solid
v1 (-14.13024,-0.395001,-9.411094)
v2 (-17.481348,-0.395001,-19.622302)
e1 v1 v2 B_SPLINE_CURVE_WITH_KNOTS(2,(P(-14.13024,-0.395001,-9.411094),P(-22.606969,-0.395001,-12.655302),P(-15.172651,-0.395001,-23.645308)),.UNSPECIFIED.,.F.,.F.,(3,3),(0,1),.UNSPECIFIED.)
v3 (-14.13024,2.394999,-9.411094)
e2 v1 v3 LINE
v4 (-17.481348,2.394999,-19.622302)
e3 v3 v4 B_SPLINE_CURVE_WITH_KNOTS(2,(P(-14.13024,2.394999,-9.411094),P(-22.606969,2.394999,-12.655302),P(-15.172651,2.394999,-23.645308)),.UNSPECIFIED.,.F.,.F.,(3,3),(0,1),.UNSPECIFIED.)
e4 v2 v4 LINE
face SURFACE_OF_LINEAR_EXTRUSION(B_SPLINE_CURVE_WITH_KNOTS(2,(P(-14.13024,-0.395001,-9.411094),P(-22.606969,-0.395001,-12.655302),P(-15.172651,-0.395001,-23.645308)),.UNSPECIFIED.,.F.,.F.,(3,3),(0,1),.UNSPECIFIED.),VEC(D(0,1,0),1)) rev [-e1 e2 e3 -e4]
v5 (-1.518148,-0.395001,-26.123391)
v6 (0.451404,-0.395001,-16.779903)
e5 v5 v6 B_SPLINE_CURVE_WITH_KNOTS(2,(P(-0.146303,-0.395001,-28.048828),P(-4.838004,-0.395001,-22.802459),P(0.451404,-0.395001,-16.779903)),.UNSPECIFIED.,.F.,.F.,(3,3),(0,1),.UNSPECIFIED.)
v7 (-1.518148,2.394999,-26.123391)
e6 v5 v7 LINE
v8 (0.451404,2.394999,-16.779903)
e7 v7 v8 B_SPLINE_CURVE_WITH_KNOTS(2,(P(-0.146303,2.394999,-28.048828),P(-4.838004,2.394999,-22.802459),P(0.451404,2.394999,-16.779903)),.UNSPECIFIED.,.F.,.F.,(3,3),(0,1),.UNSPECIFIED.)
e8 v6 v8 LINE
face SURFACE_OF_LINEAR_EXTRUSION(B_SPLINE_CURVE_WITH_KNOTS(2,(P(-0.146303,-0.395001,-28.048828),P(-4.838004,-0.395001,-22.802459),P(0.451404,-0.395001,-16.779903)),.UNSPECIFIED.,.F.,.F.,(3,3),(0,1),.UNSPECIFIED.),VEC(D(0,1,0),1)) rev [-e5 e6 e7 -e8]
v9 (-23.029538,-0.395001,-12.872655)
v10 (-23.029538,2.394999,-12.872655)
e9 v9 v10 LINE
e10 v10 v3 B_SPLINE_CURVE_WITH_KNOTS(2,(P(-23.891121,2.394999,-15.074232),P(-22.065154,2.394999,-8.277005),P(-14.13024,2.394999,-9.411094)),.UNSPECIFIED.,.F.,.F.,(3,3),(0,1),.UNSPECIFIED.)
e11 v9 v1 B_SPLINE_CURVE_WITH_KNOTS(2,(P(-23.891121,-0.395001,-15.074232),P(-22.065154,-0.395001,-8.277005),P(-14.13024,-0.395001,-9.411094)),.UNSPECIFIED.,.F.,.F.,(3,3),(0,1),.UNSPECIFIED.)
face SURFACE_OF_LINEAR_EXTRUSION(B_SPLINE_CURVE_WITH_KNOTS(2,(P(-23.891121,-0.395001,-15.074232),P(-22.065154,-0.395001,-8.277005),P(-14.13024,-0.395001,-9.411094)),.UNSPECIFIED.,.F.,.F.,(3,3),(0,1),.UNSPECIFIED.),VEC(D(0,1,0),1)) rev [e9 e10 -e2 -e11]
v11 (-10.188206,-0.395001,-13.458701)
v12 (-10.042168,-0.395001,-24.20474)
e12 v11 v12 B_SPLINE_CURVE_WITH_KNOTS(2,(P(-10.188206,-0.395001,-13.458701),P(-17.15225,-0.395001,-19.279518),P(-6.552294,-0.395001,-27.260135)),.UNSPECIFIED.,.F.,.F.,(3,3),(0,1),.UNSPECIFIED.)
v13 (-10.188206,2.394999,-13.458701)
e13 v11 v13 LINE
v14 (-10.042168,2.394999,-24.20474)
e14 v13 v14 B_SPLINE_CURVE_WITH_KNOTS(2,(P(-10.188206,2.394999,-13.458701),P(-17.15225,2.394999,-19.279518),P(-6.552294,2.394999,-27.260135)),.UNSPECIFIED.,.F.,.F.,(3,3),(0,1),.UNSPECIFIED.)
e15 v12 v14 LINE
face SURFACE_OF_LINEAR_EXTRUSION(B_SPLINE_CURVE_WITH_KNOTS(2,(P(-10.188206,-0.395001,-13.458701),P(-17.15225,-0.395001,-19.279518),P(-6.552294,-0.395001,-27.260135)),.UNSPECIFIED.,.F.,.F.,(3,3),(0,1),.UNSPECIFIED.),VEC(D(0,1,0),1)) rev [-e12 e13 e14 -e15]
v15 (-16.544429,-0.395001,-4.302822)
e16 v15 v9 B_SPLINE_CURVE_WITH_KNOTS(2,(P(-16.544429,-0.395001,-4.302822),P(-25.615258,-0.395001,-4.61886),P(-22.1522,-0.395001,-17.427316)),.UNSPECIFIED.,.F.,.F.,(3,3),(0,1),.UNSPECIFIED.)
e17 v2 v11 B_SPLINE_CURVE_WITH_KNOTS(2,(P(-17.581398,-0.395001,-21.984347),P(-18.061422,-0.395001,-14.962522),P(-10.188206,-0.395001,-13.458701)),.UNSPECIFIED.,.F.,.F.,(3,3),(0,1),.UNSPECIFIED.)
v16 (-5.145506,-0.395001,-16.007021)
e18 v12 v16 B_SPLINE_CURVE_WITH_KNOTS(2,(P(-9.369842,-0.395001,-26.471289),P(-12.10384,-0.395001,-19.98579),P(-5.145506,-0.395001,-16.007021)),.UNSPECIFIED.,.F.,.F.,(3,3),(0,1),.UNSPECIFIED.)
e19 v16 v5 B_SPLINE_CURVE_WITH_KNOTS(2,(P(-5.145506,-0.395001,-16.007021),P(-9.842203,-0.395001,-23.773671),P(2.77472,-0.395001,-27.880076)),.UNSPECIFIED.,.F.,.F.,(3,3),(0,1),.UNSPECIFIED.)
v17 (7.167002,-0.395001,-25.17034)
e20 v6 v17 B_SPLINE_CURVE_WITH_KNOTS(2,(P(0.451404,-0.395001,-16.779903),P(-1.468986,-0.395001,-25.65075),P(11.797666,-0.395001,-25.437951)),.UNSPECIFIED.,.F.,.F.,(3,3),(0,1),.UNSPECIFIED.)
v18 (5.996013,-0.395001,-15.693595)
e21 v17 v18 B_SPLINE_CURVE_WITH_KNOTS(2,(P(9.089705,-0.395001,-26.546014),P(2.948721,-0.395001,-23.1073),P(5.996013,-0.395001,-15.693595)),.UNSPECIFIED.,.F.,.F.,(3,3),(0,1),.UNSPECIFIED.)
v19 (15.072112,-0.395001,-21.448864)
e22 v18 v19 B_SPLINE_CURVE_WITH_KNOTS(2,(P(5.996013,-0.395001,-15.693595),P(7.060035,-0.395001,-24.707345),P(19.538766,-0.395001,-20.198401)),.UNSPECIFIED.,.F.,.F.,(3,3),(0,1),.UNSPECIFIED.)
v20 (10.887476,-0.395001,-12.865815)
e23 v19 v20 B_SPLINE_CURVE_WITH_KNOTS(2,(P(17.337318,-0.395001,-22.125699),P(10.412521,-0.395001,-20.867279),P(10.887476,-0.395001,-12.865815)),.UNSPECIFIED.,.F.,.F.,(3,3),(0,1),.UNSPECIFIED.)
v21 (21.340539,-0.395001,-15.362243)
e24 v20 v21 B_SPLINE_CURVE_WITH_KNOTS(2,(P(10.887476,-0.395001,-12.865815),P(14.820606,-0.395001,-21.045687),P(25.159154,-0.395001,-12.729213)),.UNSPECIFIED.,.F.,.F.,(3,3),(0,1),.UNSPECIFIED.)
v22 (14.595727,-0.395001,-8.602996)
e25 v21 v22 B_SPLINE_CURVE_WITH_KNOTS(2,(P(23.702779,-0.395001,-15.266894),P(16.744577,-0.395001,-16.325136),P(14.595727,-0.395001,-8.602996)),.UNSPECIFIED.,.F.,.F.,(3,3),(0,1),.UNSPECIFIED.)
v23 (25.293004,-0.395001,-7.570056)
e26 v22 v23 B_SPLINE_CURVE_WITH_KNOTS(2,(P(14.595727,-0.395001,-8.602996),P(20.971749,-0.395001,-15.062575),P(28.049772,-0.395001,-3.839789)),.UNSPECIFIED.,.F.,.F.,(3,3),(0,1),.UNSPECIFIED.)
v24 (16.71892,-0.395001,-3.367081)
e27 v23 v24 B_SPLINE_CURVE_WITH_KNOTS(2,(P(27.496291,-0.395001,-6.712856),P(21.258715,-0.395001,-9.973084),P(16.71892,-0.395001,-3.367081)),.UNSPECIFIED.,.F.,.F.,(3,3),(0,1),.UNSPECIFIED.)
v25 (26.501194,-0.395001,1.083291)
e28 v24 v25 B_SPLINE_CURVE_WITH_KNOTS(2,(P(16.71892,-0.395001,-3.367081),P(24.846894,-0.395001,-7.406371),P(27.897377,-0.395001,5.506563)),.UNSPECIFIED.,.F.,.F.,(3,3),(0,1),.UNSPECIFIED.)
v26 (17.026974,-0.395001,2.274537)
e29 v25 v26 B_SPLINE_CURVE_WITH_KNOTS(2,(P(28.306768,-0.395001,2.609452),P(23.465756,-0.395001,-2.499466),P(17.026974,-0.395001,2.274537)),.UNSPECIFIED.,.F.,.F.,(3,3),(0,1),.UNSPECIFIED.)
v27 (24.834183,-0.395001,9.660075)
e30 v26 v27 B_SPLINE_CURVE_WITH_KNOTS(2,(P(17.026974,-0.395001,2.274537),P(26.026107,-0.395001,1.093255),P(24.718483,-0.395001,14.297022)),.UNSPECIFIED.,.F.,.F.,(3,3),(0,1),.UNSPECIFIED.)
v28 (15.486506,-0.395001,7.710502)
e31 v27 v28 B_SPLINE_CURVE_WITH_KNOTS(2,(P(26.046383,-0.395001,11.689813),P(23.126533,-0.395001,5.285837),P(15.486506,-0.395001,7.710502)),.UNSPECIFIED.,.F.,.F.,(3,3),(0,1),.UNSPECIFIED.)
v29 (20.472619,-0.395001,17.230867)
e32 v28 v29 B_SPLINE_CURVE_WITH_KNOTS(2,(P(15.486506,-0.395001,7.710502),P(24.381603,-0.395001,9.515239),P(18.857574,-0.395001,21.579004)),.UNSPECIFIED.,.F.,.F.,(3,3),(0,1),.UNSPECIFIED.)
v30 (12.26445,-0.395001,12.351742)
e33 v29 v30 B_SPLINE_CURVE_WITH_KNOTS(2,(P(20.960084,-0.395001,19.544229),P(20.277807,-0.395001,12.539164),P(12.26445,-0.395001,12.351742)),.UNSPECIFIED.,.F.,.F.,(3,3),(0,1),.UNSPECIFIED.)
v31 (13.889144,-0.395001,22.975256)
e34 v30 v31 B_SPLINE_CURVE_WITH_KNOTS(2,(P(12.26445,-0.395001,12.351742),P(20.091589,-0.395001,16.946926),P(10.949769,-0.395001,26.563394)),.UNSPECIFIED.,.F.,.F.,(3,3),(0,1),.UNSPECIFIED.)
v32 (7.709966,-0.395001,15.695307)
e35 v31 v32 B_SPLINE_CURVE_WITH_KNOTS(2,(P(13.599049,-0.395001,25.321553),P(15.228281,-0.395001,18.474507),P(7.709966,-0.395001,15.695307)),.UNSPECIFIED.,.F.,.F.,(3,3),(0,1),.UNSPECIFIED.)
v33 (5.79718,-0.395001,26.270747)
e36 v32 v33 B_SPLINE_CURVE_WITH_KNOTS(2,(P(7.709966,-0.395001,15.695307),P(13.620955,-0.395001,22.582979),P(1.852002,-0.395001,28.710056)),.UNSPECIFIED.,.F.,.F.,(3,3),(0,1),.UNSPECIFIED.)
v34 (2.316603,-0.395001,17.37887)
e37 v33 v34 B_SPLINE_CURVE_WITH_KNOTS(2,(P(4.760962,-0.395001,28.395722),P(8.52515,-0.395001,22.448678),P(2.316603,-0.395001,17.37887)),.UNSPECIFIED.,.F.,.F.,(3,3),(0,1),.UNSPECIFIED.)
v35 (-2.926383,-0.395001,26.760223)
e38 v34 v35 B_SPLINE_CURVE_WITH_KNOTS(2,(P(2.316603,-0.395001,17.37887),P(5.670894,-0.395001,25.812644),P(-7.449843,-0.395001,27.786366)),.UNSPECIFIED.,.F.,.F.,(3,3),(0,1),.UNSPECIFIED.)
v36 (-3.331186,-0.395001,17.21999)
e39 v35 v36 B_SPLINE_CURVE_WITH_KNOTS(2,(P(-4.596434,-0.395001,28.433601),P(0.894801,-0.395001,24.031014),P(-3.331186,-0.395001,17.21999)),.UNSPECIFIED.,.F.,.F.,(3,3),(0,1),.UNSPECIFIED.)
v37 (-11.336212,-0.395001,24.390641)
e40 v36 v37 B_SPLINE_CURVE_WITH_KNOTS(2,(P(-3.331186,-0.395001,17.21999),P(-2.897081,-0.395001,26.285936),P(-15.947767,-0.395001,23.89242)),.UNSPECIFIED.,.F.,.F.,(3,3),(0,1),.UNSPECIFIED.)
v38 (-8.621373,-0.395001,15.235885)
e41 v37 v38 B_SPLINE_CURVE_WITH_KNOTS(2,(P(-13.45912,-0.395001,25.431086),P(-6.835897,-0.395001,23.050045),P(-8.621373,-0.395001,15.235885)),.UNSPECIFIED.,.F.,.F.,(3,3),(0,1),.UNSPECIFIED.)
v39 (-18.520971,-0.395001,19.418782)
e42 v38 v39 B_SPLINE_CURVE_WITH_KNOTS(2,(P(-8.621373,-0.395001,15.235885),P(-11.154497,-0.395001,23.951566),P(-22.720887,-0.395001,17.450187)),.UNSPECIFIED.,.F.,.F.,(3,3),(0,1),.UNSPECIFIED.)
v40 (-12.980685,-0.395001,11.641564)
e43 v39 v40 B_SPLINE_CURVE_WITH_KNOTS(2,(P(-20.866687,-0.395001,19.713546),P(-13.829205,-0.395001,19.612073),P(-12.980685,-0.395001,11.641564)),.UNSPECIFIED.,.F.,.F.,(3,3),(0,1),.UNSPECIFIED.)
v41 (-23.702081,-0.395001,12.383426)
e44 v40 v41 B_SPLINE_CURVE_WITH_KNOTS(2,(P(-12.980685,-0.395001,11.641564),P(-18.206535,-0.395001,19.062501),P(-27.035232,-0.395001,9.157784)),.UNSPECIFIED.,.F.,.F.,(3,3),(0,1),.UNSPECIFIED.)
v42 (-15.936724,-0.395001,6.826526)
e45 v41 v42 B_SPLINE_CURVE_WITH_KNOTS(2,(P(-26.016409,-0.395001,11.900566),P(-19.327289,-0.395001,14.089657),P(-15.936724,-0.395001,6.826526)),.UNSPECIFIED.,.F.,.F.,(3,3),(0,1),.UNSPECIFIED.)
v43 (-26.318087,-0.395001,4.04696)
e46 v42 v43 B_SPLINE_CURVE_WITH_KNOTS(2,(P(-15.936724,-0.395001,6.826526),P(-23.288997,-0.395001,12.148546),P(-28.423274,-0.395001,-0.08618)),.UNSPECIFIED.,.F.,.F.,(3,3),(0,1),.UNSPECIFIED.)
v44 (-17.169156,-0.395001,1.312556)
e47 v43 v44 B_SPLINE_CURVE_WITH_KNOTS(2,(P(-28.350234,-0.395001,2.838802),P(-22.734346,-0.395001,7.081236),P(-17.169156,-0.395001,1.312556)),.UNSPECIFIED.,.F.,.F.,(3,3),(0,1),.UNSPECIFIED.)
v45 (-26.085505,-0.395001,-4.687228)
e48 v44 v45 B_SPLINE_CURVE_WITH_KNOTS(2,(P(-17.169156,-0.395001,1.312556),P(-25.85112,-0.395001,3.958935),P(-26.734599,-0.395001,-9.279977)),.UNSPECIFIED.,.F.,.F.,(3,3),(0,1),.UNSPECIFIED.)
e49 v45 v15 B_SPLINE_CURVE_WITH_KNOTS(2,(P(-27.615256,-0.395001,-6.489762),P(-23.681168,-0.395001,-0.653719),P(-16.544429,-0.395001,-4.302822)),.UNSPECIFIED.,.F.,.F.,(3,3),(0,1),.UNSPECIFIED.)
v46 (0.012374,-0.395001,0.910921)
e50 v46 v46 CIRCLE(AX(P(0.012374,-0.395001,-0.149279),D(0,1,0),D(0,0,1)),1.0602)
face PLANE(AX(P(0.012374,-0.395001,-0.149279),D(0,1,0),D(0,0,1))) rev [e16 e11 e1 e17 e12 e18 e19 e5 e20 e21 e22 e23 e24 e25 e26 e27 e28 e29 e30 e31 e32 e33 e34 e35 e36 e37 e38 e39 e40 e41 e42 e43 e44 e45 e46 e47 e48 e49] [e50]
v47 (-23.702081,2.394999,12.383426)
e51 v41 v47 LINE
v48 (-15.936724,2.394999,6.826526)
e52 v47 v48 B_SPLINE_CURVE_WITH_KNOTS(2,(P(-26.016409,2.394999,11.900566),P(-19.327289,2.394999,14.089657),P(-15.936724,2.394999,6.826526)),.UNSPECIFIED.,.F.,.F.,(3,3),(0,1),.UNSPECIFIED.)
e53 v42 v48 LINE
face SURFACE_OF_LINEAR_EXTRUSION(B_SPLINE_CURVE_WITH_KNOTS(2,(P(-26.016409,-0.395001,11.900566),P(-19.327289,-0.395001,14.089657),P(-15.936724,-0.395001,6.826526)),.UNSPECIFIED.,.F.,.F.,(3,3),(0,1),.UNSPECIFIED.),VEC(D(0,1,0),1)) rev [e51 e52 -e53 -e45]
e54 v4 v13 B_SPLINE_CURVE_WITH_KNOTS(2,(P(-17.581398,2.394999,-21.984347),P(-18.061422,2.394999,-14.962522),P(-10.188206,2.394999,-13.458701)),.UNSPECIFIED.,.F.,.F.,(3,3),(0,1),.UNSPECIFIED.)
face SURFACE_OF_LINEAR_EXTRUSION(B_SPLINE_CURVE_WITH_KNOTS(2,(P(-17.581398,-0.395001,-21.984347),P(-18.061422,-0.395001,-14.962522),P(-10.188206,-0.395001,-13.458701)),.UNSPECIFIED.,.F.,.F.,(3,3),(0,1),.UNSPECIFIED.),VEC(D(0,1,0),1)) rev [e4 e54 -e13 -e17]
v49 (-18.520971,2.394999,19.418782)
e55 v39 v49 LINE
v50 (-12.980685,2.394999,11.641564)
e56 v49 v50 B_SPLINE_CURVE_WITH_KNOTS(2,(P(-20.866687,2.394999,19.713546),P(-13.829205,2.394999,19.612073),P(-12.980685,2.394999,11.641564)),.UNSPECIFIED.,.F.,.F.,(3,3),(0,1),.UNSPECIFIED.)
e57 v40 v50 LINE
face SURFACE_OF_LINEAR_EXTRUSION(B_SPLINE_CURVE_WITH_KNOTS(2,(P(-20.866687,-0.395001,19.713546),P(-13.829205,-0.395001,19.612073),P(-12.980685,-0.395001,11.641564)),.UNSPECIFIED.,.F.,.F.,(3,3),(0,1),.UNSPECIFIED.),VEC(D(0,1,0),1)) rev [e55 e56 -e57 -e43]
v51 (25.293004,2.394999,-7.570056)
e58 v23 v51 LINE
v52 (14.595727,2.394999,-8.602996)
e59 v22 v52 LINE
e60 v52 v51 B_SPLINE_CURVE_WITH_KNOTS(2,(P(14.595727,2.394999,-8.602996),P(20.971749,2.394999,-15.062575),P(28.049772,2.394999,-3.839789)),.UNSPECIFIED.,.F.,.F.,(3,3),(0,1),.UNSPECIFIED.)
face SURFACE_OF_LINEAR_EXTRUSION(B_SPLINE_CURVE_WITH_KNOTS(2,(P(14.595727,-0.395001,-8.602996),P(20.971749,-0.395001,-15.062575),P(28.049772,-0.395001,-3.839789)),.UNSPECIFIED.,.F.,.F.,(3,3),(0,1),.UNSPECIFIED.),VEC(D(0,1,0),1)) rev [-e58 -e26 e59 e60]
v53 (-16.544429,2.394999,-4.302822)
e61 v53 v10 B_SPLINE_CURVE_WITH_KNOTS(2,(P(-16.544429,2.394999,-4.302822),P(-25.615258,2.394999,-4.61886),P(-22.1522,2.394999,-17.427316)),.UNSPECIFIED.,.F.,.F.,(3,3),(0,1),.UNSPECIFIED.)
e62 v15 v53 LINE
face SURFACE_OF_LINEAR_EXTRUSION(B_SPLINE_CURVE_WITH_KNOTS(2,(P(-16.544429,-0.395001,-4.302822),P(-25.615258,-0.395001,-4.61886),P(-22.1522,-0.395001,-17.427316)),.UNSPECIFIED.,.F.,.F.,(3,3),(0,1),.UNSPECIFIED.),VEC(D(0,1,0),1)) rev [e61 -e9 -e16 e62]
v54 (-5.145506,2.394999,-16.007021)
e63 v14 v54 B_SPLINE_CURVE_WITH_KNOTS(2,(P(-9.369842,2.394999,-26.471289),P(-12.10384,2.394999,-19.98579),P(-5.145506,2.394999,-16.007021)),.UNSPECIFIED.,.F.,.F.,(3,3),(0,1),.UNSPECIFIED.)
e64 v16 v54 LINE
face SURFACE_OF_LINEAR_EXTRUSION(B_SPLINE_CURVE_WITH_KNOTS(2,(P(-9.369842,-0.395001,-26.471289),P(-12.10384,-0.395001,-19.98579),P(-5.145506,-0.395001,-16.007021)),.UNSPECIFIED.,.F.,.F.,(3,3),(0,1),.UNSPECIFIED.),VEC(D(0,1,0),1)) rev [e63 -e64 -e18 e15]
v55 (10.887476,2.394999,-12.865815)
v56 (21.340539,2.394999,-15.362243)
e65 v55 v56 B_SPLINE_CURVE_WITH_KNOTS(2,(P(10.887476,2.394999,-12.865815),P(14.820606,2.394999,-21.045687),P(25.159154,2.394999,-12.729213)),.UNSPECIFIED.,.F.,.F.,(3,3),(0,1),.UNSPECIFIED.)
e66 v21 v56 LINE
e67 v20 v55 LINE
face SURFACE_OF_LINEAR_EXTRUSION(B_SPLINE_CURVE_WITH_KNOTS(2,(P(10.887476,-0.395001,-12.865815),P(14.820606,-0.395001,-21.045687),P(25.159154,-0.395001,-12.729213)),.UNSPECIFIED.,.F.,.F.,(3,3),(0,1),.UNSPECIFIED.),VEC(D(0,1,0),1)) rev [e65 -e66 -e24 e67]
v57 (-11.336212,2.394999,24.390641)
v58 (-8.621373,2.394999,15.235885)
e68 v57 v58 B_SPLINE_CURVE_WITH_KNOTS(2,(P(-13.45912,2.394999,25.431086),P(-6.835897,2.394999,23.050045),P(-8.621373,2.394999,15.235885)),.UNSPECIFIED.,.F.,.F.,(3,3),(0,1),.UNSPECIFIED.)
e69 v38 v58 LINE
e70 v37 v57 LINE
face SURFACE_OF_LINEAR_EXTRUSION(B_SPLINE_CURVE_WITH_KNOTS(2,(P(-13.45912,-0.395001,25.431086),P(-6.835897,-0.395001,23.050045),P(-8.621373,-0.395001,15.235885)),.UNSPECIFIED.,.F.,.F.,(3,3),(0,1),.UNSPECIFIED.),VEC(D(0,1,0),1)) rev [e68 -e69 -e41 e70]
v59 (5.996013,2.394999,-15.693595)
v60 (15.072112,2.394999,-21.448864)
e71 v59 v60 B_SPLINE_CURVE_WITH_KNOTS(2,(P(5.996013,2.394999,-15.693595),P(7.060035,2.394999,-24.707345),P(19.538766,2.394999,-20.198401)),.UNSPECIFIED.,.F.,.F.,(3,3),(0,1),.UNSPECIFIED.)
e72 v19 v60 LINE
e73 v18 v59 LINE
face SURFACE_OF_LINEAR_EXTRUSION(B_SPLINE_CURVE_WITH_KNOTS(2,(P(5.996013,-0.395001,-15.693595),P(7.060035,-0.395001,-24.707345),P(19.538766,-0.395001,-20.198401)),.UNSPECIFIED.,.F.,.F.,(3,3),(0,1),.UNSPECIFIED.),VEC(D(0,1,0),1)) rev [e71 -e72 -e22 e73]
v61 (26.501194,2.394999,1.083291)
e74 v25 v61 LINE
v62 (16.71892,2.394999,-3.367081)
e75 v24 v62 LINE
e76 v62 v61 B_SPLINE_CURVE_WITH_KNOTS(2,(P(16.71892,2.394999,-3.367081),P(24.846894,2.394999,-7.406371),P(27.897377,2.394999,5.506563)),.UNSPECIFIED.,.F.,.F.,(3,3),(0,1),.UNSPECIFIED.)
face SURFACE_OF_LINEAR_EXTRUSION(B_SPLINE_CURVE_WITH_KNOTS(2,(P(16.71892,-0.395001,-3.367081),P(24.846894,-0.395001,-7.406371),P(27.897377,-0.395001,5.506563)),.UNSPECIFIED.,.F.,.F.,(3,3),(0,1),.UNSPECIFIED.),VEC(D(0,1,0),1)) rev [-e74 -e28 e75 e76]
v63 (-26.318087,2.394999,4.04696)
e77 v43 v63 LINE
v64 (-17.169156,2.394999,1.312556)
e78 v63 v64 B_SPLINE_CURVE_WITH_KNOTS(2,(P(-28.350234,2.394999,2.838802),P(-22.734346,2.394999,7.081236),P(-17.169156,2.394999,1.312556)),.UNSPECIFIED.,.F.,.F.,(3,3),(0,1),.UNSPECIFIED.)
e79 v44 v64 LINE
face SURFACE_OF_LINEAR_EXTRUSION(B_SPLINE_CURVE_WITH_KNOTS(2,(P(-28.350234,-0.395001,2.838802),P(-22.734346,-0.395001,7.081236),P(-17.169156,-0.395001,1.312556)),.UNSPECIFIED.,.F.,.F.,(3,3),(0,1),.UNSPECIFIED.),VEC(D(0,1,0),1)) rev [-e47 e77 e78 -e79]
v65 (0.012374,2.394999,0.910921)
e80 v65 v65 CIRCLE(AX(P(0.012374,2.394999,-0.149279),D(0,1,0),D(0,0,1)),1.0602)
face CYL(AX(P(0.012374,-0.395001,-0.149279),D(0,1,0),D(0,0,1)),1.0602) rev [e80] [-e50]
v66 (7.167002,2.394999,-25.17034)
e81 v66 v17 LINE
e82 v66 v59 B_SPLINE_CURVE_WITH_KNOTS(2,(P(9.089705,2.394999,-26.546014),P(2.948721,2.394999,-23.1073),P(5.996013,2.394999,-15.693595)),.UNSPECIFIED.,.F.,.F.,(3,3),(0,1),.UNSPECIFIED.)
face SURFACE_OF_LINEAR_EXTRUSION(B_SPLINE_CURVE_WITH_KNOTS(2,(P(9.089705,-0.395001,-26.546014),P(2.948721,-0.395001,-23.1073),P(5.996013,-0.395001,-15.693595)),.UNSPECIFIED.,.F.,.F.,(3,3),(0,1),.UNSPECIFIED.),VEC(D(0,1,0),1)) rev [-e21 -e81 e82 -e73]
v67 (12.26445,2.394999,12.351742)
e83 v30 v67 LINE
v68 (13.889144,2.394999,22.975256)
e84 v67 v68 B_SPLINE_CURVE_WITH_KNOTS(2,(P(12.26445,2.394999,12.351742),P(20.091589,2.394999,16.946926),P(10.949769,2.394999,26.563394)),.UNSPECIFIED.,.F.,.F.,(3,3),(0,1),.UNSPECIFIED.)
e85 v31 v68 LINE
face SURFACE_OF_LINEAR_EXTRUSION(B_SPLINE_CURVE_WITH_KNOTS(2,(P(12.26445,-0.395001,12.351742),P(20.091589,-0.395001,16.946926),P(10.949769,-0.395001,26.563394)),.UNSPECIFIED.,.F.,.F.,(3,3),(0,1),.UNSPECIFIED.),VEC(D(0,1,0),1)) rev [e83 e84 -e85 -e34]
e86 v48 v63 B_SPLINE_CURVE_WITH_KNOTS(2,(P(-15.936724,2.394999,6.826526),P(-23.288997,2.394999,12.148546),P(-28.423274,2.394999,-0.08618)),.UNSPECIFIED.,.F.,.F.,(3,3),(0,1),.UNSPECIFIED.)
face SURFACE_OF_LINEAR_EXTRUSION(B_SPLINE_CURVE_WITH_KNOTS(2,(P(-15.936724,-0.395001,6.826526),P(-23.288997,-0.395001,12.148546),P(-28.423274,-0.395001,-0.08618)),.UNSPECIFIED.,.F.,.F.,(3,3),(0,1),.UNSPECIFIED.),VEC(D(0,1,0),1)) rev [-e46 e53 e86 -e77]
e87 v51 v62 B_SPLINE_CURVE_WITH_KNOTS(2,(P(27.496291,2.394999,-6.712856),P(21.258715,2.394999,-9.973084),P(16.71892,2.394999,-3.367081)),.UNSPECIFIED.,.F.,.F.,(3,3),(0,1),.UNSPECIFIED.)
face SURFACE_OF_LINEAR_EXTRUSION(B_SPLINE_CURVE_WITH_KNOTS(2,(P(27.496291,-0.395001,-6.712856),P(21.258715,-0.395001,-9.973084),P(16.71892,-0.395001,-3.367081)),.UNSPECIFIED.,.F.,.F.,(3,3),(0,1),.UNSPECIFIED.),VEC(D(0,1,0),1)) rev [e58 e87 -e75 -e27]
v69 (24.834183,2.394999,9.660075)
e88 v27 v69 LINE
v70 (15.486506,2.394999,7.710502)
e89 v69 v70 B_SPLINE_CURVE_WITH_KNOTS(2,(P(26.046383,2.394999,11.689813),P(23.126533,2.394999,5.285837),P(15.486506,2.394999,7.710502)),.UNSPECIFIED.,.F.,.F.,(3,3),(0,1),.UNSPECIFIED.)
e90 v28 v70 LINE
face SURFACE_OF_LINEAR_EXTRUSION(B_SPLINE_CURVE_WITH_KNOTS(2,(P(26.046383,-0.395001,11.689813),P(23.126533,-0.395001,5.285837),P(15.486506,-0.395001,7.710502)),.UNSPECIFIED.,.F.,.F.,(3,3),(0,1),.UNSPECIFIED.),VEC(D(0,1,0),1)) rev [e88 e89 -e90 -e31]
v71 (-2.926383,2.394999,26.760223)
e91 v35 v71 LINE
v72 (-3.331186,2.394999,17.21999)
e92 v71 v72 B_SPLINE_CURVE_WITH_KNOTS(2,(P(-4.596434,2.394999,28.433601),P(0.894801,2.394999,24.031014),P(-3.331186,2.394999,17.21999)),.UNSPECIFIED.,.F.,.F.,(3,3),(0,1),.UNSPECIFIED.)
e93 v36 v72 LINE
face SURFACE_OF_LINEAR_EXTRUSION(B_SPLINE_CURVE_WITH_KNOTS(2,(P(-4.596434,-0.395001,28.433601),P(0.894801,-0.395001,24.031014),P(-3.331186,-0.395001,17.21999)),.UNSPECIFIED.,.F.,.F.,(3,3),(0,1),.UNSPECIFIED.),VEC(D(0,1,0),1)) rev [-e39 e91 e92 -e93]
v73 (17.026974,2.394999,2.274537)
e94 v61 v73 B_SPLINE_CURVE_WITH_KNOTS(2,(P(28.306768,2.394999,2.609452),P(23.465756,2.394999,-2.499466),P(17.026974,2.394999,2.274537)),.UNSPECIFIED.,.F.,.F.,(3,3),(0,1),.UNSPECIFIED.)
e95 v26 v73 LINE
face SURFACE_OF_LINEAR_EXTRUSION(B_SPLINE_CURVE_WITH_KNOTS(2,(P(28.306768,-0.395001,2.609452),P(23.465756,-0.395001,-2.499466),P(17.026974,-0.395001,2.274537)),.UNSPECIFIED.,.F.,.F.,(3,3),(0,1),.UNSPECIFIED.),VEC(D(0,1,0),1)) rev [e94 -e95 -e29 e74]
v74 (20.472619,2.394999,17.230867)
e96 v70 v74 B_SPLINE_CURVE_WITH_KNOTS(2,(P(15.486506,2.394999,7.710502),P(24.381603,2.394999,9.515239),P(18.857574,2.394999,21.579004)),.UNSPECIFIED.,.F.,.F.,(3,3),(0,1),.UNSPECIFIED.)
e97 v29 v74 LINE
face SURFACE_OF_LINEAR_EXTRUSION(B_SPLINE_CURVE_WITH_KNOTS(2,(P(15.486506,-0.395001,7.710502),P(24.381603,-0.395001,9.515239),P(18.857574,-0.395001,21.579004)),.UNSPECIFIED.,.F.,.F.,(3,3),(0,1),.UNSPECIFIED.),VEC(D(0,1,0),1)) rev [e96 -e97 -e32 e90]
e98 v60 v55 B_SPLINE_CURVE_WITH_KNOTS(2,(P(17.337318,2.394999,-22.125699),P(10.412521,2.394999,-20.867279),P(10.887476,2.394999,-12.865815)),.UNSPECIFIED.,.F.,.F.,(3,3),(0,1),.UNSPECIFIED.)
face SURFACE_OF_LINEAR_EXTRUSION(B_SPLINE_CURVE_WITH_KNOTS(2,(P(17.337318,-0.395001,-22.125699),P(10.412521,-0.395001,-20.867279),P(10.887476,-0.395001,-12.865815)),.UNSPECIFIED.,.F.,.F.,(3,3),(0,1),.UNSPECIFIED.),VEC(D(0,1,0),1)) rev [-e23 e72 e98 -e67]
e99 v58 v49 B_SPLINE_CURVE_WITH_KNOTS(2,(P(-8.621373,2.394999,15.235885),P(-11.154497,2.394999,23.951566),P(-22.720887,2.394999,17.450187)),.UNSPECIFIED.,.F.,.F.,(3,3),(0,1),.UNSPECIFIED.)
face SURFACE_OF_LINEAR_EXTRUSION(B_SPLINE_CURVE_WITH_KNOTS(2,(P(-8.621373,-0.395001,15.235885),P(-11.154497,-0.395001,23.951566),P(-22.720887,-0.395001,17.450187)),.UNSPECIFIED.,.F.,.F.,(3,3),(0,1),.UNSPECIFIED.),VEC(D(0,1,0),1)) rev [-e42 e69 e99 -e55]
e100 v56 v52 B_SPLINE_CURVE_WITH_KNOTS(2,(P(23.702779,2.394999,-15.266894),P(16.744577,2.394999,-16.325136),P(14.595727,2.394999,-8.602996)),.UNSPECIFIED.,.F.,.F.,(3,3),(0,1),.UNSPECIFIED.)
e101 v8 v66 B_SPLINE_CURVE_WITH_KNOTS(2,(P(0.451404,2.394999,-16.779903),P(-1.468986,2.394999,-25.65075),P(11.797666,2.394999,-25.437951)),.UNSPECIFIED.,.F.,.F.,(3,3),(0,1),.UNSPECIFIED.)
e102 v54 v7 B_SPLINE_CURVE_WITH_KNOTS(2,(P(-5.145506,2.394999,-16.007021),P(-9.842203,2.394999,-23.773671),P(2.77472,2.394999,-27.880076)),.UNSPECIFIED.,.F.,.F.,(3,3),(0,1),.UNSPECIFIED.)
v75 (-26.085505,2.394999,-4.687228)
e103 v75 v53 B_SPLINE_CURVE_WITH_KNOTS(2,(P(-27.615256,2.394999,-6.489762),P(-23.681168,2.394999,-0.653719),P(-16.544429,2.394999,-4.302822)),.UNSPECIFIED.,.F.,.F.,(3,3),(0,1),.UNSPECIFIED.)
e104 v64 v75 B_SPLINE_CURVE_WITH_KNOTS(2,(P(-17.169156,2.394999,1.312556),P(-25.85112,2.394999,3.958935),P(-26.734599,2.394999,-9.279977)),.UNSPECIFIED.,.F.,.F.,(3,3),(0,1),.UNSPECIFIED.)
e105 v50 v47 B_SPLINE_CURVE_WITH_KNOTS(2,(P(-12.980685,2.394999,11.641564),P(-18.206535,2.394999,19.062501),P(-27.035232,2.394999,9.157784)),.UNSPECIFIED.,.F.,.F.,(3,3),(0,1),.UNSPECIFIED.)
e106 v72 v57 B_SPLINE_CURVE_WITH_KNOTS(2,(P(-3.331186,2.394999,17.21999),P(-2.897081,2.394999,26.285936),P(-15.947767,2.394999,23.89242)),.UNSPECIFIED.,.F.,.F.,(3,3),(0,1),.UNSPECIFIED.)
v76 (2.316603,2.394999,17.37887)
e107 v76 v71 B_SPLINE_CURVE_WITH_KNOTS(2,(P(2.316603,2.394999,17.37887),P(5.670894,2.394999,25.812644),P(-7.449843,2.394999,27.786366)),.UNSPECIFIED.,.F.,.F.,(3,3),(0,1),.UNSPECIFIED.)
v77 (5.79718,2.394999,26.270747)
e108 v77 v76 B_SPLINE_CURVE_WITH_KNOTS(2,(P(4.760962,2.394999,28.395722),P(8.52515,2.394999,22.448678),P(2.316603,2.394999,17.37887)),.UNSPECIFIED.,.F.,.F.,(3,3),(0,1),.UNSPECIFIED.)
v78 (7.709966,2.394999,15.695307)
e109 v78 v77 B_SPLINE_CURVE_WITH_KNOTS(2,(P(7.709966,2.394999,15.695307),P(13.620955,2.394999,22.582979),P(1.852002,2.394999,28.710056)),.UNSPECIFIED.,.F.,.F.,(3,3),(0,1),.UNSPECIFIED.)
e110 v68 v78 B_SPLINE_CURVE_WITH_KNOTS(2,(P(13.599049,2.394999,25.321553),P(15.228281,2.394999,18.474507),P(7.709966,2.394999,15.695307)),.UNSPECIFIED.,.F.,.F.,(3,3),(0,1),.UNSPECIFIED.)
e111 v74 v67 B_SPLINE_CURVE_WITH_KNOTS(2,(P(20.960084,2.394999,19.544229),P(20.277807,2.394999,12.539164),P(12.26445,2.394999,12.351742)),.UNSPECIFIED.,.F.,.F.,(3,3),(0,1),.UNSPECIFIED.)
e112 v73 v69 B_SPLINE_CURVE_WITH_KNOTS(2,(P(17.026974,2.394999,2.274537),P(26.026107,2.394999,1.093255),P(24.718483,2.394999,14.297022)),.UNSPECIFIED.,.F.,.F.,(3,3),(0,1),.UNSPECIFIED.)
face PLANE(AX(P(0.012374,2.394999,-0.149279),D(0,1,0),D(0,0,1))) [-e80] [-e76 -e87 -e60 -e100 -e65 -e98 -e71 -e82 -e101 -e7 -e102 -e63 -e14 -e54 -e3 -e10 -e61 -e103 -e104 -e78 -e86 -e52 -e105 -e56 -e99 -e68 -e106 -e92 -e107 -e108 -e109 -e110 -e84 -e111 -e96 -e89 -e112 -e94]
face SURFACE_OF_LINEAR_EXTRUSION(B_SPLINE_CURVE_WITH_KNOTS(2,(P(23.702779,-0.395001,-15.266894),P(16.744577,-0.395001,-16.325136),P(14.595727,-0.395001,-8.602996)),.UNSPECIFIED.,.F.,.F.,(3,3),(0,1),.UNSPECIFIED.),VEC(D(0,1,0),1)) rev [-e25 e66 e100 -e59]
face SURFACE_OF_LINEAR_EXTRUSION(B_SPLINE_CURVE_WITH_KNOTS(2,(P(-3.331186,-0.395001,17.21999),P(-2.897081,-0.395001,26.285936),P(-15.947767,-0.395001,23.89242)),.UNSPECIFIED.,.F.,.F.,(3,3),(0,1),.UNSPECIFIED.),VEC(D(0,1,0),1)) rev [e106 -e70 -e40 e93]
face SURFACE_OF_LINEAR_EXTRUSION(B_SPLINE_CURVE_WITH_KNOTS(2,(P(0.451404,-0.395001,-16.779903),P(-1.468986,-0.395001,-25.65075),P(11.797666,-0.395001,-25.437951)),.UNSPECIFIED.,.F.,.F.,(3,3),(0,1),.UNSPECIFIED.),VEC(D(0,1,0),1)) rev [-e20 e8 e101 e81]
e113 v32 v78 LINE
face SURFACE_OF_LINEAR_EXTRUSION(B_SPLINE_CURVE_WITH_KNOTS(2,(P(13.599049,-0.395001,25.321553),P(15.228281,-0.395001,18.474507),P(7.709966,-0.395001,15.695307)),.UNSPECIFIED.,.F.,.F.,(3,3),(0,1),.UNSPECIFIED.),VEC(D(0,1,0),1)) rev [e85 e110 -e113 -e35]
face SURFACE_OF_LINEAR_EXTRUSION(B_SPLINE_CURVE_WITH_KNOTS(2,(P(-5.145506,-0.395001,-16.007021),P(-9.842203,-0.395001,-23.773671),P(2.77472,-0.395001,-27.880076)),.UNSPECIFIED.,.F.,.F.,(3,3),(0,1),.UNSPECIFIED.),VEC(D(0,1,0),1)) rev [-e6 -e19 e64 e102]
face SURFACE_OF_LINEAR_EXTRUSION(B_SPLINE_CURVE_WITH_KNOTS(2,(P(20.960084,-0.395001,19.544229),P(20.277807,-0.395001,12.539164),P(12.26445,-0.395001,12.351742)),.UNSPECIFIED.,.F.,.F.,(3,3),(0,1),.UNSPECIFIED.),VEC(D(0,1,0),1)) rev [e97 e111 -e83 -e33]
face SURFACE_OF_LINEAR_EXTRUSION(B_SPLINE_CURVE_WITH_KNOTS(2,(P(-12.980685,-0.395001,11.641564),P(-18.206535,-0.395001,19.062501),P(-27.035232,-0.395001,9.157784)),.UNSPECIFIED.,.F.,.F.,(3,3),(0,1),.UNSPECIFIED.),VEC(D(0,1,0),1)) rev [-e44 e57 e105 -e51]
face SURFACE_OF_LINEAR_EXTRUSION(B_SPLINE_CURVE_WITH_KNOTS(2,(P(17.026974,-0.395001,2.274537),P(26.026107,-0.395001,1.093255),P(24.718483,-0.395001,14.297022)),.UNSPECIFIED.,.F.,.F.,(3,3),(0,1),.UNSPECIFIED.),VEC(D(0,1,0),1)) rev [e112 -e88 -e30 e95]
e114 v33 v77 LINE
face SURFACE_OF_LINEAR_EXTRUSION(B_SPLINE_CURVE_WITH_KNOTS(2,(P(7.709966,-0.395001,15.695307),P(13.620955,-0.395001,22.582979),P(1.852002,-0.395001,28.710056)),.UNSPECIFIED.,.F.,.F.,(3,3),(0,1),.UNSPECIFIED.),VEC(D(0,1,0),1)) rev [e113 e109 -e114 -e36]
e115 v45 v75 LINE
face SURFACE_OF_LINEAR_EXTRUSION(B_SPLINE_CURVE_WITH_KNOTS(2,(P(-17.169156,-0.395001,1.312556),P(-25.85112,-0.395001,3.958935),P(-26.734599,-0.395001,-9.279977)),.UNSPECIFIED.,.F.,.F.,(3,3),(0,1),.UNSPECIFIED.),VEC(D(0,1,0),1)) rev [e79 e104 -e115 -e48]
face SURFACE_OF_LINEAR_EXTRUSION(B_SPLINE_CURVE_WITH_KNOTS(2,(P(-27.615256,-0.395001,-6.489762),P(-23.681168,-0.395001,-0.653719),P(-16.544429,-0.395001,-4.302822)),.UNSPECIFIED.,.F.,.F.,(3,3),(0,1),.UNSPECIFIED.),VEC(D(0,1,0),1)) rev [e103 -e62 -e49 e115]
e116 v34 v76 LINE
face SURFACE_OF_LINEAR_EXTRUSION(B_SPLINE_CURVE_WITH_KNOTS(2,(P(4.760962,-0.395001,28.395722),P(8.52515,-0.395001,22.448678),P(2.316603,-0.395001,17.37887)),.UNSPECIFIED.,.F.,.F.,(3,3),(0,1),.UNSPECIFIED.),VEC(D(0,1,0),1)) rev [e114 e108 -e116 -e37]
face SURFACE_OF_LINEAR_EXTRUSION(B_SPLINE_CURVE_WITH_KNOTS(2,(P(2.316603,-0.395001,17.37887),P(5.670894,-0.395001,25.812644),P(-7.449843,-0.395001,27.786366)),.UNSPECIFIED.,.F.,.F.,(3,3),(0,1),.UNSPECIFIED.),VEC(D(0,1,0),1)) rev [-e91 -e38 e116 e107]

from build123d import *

# Parameters (mm, degrees)
SKETCH1_R           = 20
BOSS_EXTRUDE1_DEPTH = 2
CUT_EXTRUDE10_DEPTH = 29.354893758
CIRPATTERN1_DEPTH   = 2
SKETCH5_R           = 0.76
CUT_EXTRUDE11_DEPTH = 28.141520821
SCALE1_SCALE        = 1.5
SCALE2_SCALE        = 0.93


# Read off the part's stored shape, not the designer's step: CirPattern1
with BuildPart() as part:
    # Sketch1 → Boss-Extrude1 (new body)
    with BuildSketch(Plane(origin=(0, 0, 0), x_dir=(1, 0, 0), z_dir=(0, 1, 0))):
        with Locations(Location((0, 0, 0), (0, 0, 270))):
            Circle(SKETCH1_R)
    extrude(amount=BOSS_EXTRUDE1_DEPTH)

    # Sketch3 → Cut-Extrude10 (cut, through all)
    with BuildSketch(Plane(origin=(0, 2, 0), x_dir=(1, 0, 0), z_dir=(0, 1, 0))):
        with BuildLine():
            Line((-0.11374729, 19.999676536), (2.525531299, 21.841438752))
            Line((2.525531299, 21.841438752), (8.448237607, 18.128079913))
            add(Edge.make_bspline(
                [(0.314716636, 11.921594207), (-1.061906761, 18.280624108), (8.448237607, 18.128079913)],
                knots=[0, 0, 0, 1, 1, 1], degree=2))
            add(Edge.make_bspline(
                [(-0.11374729, 19.999676536), (-3.476973379, 16.23883842), (0.314716636, 11.921594207)],
                knots=[0, 0, 0, 1, 1, 1], degree=2))
        make_face()
    extrude(amount=-CUT_EXTRUDE10_DEPTH, mode=Mode.SUBTRACT)

    # CirPattern1 outline → CirPattern1 (cut)
    with BuildSketch(Plane(origin=(0, 0, 0), x_dir=(1, 0, 0), z_dir=(0, 1, 0))):
        with BuildLine():
            add(Edge.make_bspline(
                [(-7.207557435, 17.244057808), (-7.782239787, 13.703261178), (-3.697405485, 11.367556407)],
                knots=[0.181076354, 0.181076354, 0.181076354, 1, 1, 1], degree=2))
            add(Edge.make_bspline(
                [(-3.697405485, 11.367556407), (-6.402099222, 15.840148745), (-1.097148713, 18.619435028)],
                knots=[0, 0, 0, 0.803340706, 0.803340706, 0.803340706], degree=2))
            add(Edge.make_bspline(
                [(-0.11374729, 19.999676536), (-0.722748007, 19.318677683), (-1.097148713, 18.619435028)],
                knots=[0, 0, 0, 0.181076354, 0.181076354, 0.181076354], degree=2))
            ThreePointArc((-0.11374729, 19.999676536), (-4.271024547, -19.538637345), (8.448237607, 18.128079913))
            add(Edge.make_bspline(
                [(5.128765463, 17.936244047), (6.577979327, 18.158079147), (8.448237607, 18.128079913)],
                knots=[0.803340706, 0.803340706, 0.803340706, 1, 1, 1], degree=2))
            add(Edge.make_bspline(
                [(5.128765463, 17.936244047), (2.500458036, 15.495035196), (4.289346694, 11.142878787)],
                knots=[0.181076354, 0.181076354, 0.181076354, 1, 1, 1], degree=2))
            add(Edge.make_bspline(
                [(4.289346694, 11.142878787), (4.902086374, 16.33363986), (10.795510687, 15.268519209)],
                knots=[0, 0, 0, 0.803340706, 0.803340706, 0.803340706], degree=2))
            add(Edge.make_bspline(
                [(10.795510687, 15.268519209), (7.516952988, 13.812991814), (7.795771849, 9.115796046)],
                knots=[0.181076354, 0.181076354, 0.181076354, 1, 1, 1], degree=2))
            add(Edge.make_bspline(
                [(7.795771849, 9.115796046), (10.060748967, 13.826351118), (15.289007186, 10.905349896)],
                knots=[0, 0, 0, 0.803340706, 0.803340706, 0.803340706], degree=2))
            add(Edge.make_bspline(
                [(15.289007186, 10.905349896), (11.715481814, 10.593232934), (10.454016527, 6.060011853)],
                knots=[0.181076354, 0.181076354, 0.181076354, 1, 1, 1], degree=2))
            add(Edge.make_bspline(
                [(10.454016527, 6.060011853), (14.125785669, 9.779899189), (18.12231489, 5.319553202)],
                knots=[0, 0, 0, 0.803340706, 0.803340706, 0.803340706], degree=2))
            add(Edge.make_bspline(
                [(18.12231489, 5.319553202), (14.641068768, 6.18466939), (11.97601867, 2.306667841)],
                knots=[0.181076354, 0.181076354, 0.181076354, 1, 1, 1], degree=2))
            add(Edge.make_bspline(
                [(11.97601867, 2.306667841), (16.656686676, 4.632779929), (18.988400946, -0.883563127)],
                knots=[0, 0, 0, 0.803340706, 0.803340706, 0.803340706], degree=2))
            add(Edge.make_bspline(
                [(18.988400946, -0.883563127), (15.976681108, 1.065037449), (12.196845731, -1.737502929)],
                knots=[0.181076354, 0.181076354, 0.181076354, 1, 1, 1], degree=2))
            add(Edge.make_bspline(
                [(12.196845731, -1.737502929), (17.379189594, -1.057236426), (17.793411491, -7.031795185)],
                knots=[0, 0, 0, 0.803340706, 0.803340706, 0.803340706], degree=2))
            add(Edge.make_bspline(
                [(17.793411491, -7.031795185), (15.577584513, -4.210871331), (11.09256767, -5.6342518)],
                knots=[0.181076354, 0.181076354, 0.181076354, 1, 1, 1], degree=2))
            add(Edge.make_bspline(
                [(11.09256767, -5.6342518), (16.215000021, -6.673548315), (14.666842175, -12.458886631)],
                knots=[0, 0, 0, 0.803340706, 0.803340706, 0.803340706], degree=2))
            add(Edge.make_bspline(
                [(14.666842175, -12.458886631), (13.487027293, -9.071330369), (8.782850151, -8.961305569)],
                knots=[0.181076354, 0.181076354, 0.181076354, 1, 1, 1], degree=2))
            add(Edge.make_bspline(
                [(8.782850151, -8.961305569), (13.29027596, -11.607541197), (9.947505297, -16.576727895)],
                knots=[0, 0, 0, 0.803340706, 0.803340706, 0.803340706], degree=2))
            add(Edge.make_bspline(
                [(9.947505297, -16.576727895), (9.93155376, -12.989633509), (5.517986904, -11.358126335)],
                knots=[0.181076354, 0.181076354, 0.181076354, 1, 1, 1], degree=2))
            add(Edge.make_bspline(
                [(5.517986904, -11.358126335), (8.921956647, -15.324540386), (4.146814235, -18.939086981)],
                knots=[0, 0, 0, 0.803340706, 0.803340706, 0.803340706], degree=2))
            add(Edge.make_bspline(
                [(4.146814235, -18.939086981), (5.296454639, -15.541171808), (1.651776524, -12.564981378)],
                knots=[0.181076354, 0.181076354, 0.181076354, 1, 1, 1], degree=2))
            add(Edge.make_bspline(
                [(1.651776524, -12.564981378), (3.58341726, -17.421751343), (-2.106636126, -19.289965628)],
                knots=[0, 0, 0, 0.803340706, 0.803340706, 0.803340706], degree=2))
            add(Edge.make_bspline(
                [(-2.106636126, -19.289965628), (0.084014843, -16.4494465), (-2.396817106, -12.451089227)],
                knots=[0.181076354, 0.181076354, 0.181076354, 1, 1, 1], degree=2))
            add(Edge.make_bspline(
                [(-2.396817106, -12.451089227), (-2.146828623, -17.671908721), (-8.135187408, -17.591340689)],
                knots=[0, 0, 0, 0.803340706, 0.803340706, 0.803340706], degree=2))
            add(Edge.make_bspline(
                [(-8.135187408, -17.591340689), (-5.140916898, -15.616031929), (-6.189066045, -11.028791865)],
                knots=[0.181076354, 0.181076354, 0.181076354, 1, 1, 1], degree=2))
            add(Edge.make_bspline(
                [(-6.189066045, -11.028791865), (-7.647819946, -16.047904086), (-13.285552537, -14.027284533)],
                knots=[0, 0, 0, 0.803340706, 0.803340706, 0.803340706], degree=2))
            add(Edge.make_bspline(
                [(-13.285552537, -14.027284533), (-9.812138156, -13.131241495), (-9.314021278, -8.452217279)],
                knots=[0.181076354, 0.181076354, 0.181076354, 1, 1, 1], degree=2))
            add(Edge.make_bspline(
                [(-9.314021278, -8.452217279), (-12.323438943, -12.725723538), (-16.999609535, -8.984017946)],
                knots=[0, 0, 0, 0.803340706, 0.803340706, 0.803340706], degree=2))
            add(Edge.make_bspline(
                [(-16.999609535, -8.984017946), (-13.423449627, -9.264340798), (-11.433045416, -5.000577306)],
                knots=[0.181076354, 0.181076354, 0.181076354, 1, 1, 1], degree=2))
            add(Edge.make_bspline(
                [(-11.433045416, -5.000577306), (-15.667009745, -8.06537689), (-18.874882696, -3.008057118)],
                knots=[0, 0, 0, 0.803340706, 0.803340706, 0.803340706], degree=2))
            add(Edge.make_bspline(
                [(-18.874882696, -3.008057118), (-15.583509678, -4.434368529), (-12.316509314, -1.047910694)],
                knots=[0.181076354, 0.181076354, 0.181076354, 1, 1, 1], degree=2))
            add(Edge.make_bspline(
                [(-12.316509314, -1.047910694), (-17.316204575, -2.571885013), (-18.708157077, 3.253009868)],
                knots=[0, 0, 0, 0.803340706, 0.803340706, 0.803340706], degree=2))
            add(Edge.make_bspline(
                [(-18.708157077, 3.253009868), (-16.058242285, 0.835272872), (-11.868675951, 2.977449797)],
                knots=[0.181076354, 0.181076354, 0.181076354, 1, 1, 1], degree=2))
            add(Edge.make_bspline(
                [(-11.868675951, 2.977449797), (-17.092307584, 3.159447008), (-16.517499984, 9.120699256)],
                knots=[0, 0, 0, 0.803340706, 0.803340706, 0.803340706], degree=2))
            add(Edge.make_bspline(
                [(-16.517499984, 9.120699256), (-14.796202804, 5.973535993), (-10.13807502, 6.639293898)],
                knots=[0.181076354, 0.181076354, 0.181076354, 1, 1, 1], degree=2))
            add(Edge.make_bspline(
                [(-10.13807502, 6.639293898), (-15.019581485, 8.507540416), (-12.540303105, 13.959155852)],
                knots=[0, 0, 0, 0.803340706, 0.803340706, 0.803340706], degree=2))
            add(Edge.make_bspline(
                [(-12.540303105, 13.959155852), (-11.934152795, 10.423610295), (-7.312243985, 9.540803981)],
                knots=[0.181076354, 0.181076354, 0.181076354, 1, 1, 1], degree=2))
            add(Edge.make_bspline(
                [(-7.312243985, 9.540803981), (-11.322638312, 12.892846308), (-7.207557435, 17.244057808)],
                knots=[0, 0, 0, 0.803340706, 0.803340706, 0.803340706], degree=2))
        make_face()
    extrude(amount=CIRPATTERN1_DEPTH, mode=Mode.SUBTRACT)

    # Sketch5 → Cut-Extrude11 (cut, through all)
    with BuildSketch(Plane(origin=(0, 2, 0), x_dir=(1, 0, 0), z_dir=(0, 1, 0))):
        with Locations(Location((0, 0, 0), (0, 0, 270))):
            Circle(SKETCH5_R)
    extrude(amount=-CUT_EXTRUDE11_DEPTH, mode=Mode.SUBTRACT)


with BuildPart() as part_1:
    # Scale1: scaled about (-0.031329983, 0.999999987, 0.377918145)
    add(part.part.scale(SCALE1_SCALE).moved(Location((0.015664991, -0.499999994, -0.188959072))))


with BuildPart() as part_2:
    # Scale2: scaled about (-0.031329983, 0.999999987, 0.377918146)
    add(part_1.part.scale(SCALE2_SCALE).moved(Location((-0.002193099, 0.069999999, 0.02645427))))


solid = part_2.part
